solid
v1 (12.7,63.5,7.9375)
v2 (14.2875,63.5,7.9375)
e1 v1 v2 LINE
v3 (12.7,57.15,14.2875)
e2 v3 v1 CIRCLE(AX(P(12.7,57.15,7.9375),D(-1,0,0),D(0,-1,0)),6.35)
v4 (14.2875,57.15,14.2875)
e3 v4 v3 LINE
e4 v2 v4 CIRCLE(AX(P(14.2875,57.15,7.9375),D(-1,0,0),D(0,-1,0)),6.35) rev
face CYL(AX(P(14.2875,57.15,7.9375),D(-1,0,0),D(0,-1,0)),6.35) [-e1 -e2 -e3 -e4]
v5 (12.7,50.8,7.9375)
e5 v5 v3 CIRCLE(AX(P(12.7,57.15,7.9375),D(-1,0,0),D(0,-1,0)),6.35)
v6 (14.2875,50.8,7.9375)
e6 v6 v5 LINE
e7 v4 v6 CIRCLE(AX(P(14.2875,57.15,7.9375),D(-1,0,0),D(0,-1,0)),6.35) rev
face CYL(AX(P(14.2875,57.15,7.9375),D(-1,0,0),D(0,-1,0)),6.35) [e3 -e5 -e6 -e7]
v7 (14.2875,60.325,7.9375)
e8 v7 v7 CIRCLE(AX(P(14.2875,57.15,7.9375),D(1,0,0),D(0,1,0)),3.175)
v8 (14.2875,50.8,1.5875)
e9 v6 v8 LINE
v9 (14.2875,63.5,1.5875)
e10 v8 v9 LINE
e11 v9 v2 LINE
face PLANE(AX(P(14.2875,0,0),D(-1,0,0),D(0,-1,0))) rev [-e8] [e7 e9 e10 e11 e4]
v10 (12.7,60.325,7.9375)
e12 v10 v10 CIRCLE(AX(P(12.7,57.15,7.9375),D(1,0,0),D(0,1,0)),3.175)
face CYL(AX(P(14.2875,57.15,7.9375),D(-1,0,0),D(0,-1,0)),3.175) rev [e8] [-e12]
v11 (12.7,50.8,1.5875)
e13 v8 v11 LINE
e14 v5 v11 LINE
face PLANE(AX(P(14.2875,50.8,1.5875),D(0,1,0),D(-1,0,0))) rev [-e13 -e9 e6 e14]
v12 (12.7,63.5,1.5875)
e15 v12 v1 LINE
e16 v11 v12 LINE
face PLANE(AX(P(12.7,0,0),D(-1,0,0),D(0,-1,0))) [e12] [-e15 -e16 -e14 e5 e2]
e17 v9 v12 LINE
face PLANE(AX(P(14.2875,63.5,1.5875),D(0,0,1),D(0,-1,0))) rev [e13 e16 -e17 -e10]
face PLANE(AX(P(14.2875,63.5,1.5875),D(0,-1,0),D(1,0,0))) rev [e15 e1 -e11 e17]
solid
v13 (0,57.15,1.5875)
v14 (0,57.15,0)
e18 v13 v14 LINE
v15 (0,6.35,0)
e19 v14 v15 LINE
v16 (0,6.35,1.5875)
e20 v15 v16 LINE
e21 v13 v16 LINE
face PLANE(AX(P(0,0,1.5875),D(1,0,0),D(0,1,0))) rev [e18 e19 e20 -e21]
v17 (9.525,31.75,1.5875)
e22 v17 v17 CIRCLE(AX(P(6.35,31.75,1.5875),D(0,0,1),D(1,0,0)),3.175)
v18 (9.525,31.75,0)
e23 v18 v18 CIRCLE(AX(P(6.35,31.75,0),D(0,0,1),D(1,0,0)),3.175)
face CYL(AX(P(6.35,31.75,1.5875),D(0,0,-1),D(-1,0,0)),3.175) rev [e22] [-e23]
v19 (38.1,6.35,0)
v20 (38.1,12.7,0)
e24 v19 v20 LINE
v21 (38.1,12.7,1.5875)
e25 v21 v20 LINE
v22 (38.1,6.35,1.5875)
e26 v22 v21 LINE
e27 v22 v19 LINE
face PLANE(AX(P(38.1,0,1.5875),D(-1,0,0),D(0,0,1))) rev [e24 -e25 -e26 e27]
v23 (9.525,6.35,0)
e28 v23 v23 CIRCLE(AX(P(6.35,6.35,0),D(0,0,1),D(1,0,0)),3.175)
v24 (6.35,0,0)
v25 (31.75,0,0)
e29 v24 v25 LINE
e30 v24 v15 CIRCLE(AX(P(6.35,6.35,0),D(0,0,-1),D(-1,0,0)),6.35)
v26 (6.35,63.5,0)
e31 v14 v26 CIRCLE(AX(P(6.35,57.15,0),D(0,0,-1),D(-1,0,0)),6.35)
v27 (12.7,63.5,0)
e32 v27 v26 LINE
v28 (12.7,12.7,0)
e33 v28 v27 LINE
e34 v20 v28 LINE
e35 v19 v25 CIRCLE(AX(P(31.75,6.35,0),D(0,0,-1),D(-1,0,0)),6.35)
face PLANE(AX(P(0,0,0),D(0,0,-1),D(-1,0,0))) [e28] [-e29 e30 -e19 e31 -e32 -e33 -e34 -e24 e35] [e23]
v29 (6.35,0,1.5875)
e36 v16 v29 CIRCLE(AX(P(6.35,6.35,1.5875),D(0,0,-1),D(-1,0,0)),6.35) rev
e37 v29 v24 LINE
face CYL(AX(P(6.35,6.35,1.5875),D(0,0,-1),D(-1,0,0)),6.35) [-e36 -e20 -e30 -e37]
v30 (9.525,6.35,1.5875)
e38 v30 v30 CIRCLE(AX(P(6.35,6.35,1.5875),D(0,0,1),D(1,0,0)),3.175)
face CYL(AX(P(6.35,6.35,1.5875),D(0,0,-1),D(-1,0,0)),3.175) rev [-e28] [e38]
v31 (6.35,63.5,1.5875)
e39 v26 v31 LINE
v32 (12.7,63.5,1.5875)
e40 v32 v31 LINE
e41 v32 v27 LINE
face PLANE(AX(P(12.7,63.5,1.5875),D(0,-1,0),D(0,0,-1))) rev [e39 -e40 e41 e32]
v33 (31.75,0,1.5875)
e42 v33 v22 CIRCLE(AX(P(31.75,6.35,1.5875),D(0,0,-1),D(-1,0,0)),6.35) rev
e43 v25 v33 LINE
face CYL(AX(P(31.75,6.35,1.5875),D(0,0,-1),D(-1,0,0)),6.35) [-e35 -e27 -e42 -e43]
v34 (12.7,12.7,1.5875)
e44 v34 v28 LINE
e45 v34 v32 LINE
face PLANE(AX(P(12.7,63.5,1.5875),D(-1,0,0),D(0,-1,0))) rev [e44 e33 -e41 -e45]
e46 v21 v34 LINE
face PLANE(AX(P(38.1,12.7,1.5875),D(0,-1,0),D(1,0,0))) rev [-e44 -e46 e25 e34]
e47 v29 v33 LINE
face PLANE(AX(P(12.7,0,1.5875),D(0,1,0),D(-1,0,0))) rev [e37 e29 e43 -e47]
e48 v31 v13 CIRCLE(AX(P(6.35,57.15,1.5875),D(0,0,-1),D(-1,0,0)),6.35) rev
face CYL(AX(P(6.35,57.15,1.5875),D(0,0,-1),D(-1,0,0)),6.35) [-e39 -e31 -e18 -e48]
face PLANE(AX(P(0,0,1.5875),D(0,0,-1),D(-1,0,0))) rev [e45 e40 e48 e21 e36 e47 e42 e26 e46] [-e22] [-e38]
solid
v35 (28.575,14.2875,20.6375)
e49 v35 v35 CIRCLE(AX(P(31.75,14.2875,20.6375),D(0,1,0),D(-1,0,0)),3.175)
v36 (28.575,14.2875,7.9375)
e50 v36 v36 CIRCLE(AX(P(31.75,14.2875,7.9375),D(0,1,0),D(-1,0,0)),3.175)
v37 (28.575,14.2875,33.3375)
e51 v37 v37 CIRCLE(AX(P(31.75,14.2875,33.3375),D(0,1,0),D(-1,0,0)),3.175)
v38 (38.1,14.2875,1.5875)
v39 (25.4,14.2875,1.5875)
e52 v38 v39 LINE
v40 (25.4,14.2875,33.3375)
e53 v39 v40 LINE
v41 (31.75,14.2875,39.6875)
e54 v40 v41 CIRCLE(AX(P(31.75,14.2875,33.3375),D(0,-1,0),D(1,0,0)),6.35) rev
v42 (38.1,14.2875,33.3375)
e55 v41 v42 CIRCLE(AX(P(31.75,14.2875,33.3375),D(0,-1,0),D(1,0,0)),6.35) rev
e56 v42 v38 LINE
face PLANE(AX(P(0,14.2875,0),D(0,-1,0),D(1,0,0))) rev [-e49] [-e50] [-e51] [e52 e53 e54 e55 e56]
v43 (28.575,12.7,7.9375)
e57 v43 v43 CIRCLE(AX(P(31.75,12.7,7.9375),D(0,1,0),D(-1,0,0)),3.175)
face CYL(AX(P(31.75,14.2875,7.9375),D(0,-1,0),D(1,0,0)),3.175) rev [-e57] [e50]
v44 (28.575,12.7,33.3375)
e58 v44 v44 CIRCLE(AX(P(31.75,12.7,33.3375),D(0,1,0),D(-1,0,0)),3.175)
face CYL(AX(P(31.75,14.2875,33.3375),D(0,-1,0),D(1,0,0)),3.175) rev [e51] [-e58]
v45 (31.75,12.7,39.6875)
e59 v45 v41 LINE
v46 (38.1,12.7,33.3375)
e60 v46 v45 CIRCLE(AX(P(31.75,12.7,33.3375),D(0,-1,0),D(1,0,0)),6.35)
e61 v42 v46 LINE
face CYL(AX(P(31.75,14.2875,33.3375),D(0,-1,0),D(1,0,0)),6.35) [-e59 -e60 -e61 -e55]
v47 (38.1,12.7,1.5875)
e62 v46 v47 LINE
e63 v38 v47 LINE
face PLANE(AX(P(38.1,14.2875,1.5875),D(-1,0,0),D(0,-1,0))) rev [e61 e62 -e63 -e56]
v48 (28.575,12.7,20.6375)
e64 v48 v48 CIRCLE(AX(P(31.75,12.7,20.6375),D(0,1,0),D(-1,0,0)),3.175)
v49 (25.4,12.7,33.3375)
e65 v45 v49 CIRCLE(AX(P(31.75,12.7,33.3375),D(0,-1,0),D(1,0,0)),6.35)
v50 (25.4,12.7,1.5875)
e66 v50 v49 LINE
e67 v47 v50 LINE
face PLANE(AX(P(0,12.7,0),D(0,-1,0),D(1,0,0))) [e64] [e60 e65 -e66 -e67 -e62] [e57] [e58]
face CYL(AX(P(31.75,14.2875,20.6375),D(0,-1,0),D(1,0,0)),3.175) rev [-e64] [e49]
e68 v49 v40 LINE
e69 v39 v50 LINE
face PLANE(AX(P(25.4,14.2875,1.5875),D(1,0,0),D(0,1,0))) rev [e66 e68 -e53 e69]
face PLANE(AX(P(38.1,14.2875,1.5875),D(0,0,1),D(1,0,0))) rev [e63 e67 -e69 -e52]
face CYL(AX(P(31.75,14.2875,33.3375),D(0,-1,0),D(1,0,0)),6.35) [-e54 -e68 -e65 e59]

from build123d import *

# Parameters (mm, degrees)
SKETCH1_R           = 3.175
BOSS_EXTRUDE1_DEPTH = 1.5875
SKETCH2_W           = 12.7
SKETCH2_H           = 12.7
SKETCH2_R           = 3.175
BOSS_EXTRUDE2_DEPTH = 1.5875
SKETCH3_W           = 12.7
SKETCH3_H           = 38.1
SKETCH3_R           = 3.175
BOSS_EXTRUDE3_DEPTH = 1.5875
FILLET1_R           = 6.35
FILLET2_R           = 6.35
FILLET3_R           = 6.35


with BuildPart() as part:
    # Sketch1 → Boss-Extrude1 (new body)
    with BuildSketch(Plane.XY):
        Polygon((12.7, 0), (38.1, 0), (38.1, 12.7), (12.7, 12.7), (12.7, 63.5), (0, 63.5), (0, 0), align=None)
        with Locations((6.35, 31.75)):
            Circle(SKETCH1_R, mode=Mode.SUBTRACT)
        with Locations((6.35, 6.35)):
            Circle(SKETCH1_R, mode=Mode.SUBTRACT)
    extrude(amount=BOSS_EXTRUDE1_DEPTH)

    # Fillet3
    fillet3_edges = [part.edges().sort_by_distance(p)[0] for p in [
        (0, 0, 0.79375),
        (0, 63.5, 0.79375),
        (38.1, 0, 0.79375),
    ]]
    fillet(fillet3_edges, radius=FILLET3_R)


with BuildPart() as body_2:
    # Sketch2 → Boss-Extrude2 (new body)
    with BuildSketch(Plane(origin=(12.7, 0, 0), x_dir=(0, 0, -1), z_dir=(1, 0, 0))):
        with Locations((-7.9375, 57.15)):
            Rectangle(SKETCH2_W, SKETCH2_H)
        with Locations(Location((-7.9375, 57.15, 0), (0, 0, 90))):
            Circle(SKETCH2_R, mode=Mode.SUBTRACT)
    extrude(amount=BOSS_EXTRUDE2_DEPTH)

    # Fillet2
    fillet2_edges = [body_2.edges().sort_by_distance(p)[0] for p in [
        (13.49375, 50.8, 14.2875),
        (13.49375, 63.5, 14.2875),
    ]]
    fillet(fillet2_edges, radius=FILLET2_R - 0.0001)  # a hair under: the kernel refuses the full size


with BuildPart() as body_3:
    # Sketch3 → Boss-Extrude3 (new body)
    with BuildSketch(Plane(origin=(0, 12.7, 0), x_dir=(1, 0, 0), z_dir=(0, 1, 0))):
        with Locations((31.75, -20.6375)):
            Rectangle(SKETCH3_W, SKETCH3_H)
        with Locations(Location((31.75, -7.9375, 0), (0, 0, 180))):
            Circle(SKETCH3_R, mode=Mode.SUBTRACT)
        with Locations(Location((31.75, -20.6375, 0), (0, 0, 180))):
            Circle(SKETCH3_R, mode=Mode.SUBTRACT)
        with Locations(Location((31.75, -33.3375, 0), (0, 0, 180))):
            Circle(SKETCH3_R, mode=Mode.SUBTRACT)
    extrude(amount=BOSS_EXTRUDE3_DEPTH)

    # Fillet1
    fillet1_edges = [body_3.edges().sort_by_distance(p)[0] for p in [
        (25.4, 13.49375, 39.6875),
        (38.1, 13.49375, 39.6875),
    ]]
    fillet(fillet1_edges, radius=FILLET1_R - 0.0001)  # a hair under: the kernel refuses the full size


solid = Compound([part.part, body_2.part, body_3.part])
